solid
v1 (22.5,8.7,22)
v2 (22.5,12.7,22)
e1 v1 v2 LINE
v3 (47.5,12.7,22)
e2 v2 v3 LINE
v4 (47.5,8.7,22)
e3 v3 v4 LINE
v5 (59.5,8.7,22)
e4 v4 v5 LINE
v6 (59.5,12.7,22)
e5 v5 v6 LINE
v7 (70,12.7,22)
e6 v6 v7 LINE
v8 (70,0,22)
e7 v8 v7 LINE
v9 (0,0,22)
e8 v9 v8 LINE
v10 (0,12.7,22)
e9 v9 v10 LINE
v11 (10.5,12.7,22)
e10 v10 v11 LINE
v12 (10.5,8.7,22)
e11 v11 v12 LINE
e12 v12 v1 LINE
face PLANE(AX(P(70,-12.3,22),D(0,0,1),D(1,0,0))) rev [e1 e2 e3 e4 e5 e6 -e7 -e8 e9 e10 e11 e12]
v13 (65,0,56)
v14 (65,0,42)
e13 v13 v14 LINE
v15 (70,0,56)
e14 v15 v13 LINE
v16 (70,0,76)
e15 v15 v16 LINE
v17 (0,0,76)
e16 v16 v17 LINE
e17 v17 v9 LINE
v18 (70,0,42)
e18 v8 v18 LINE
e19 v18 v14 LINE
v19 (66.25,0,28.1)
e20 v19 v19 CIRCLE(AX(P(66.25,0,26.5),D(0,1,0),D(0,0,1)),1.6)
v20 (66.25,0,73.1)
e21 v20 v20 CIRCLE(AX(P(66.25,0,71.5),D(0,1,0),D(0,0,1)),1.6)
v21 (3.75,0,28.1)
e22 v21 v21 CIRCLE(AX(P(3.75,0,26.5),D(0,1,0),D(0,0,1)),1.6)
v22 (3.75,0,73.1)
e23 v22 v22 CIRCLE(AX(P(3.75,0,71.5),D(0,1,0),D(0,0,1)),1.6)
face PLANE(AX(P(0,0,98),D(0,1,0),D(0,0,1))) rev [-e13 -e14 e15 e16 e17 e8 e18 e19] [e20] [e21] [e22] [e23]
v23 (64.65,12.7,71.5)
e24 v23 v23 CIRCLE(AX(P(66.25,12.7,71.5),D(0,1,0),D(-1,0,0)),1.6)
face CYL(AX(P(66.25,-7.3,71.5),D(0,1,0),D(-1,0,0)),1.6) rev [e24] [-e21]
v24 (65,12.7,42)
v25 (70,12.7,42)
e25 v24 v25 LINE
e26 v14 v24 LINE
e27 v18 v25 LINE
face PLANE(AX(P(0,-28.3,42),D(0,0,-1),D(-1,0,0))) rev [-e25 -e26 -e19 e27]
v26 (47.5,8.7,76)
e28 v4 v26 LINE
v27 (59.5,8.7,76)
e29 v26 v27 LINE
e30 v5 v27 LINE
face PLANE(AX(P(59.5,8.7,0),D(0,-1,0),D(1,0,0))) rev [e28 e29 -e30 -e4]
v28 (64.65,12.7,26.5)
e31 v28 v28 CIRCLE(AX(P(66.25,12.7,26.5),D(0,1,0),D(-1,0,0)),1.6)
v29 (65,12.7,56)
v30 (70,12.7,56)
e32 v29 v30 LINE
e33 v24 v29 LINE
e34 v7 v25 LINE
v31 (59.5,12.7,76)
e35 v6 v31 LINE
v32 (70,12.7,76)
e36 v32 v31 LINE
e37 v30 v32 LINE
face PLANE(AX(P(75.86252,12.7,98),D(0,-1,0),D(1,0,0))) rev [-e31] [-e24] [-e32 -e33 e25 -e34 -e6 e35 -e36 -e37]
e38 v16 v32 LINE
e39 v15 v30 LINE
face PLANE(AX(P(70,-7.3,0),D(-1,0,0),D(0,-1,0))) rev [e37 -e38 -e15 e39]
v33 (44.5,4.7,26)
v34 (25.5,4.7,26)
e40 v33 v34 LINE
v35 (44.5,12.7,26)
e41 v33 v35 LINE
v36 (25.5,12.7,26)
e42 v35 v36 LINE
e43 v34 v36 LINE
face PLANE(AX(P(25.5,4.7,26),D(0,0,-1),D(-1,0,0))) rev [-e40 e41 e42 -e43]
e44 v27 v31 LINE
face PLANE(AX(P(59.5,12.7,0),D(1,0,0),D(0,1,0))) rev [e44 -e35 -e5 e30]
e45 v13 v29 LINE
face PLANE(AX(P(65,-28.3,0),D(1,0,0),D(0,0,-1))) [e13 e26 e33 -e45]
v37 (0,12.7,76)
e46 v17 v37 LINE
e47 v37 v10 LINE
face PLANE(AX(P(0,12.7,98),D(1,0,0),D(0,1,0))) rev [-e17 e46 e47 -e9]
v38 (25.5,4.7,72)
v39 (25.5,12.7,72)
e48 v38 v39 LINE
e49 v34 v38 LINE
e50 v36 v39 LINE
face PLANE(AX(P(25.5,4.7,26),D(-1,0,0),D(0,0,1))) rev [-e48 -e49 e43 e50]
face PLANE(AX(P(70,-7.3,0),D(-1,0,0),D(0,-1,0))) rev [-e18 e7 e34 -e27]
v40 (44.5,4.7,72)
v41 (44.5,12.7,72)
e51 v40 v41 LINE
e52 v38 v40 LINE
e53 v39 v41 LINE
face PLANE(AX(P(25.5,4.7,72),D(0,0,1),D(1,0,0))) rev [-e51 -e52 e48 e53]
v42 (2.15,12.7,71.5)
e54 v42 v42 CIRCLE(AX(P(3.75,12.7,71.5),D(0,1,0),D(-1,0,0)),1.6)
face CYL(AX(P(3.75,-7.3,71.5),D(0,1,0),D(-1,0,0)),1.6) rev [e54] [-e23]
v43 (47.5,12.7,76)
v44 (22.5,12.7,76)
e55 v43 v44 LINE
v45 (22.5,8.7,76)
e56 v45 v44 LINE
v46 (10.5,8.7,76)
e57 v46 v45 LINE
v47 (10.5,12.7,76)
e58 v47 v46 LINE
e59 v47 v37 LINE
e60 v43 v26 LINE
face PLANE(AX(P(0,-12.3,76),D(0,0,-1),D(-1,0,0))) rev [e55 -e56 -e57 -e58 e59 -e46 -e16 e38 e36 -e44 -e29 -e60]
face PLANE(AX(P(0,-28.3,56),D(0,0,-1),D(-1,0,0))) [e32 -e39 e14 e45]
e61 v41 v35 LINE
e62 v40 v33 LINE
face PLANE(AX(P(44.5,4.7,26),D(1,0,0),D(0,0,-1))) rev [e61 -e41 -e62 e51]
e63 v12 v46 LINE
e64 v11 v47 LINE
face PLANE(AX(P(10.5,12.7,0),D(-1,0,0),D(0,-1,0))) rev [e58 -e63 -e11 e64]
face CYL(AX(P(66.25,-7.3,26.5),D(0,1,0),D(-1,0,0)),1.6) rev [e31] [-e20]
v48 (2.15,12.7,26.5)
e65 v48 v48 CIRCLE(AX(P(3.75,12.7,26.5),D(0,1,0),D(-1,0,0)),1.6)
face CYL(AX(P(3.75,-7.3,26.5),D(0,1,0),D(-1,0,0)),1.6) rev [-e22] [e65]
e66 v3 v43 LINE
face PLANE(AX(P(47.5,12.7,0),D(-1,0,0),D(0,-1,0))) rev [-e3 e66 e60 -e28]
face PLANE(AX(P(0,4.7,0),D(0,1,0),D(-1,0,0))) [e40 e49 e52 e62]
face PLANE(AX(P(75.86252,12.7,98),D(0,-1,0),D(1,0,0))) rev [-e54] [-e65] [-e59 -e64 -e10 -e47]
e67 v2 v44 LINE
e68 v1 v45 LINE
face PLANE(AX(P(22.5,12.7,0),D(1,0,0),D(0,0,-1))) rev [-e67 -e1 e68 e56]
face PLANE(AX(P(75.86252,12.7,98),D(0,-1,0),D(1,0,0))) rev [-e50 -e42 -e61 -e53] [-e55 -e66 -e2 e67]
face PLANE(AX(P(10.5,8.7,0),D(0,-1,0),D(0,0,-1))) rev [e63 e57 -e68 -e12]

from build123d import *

# Parameters (mm, degrees)
RESSALTO_EXTRUS_O1_DEPTH    = 98
ESBO_O4_W                   = 33
ESBO_O4_H                   = 22
CORTE_EXTRUS_O3_DEPTH       = 25
ESBO_O10_W                  = 12
ESBO_O10_H                  = 4
CORTE_EXTRUS_O8_DEPTH       = 122.545423608
ESBO_O11_R                  = 1.6
CORTE_EXTRUS_O9_DEPTH       = 20
ESBO_O15_W                  = 4
ESBO_O15_H                  = 22
CORTE_EXTRUS_O11_DEPTH      = 137.386546257
CORTE_EXTRUS_O12_DEPTH      = 10
CORTE_EXTRUS_O12_DEPTH_BACK = 41
ESBO_O16_W                  = 5
ESBO_O16_H                  = 14
ESBO_O17_W                  = 11.435879356
ESBO_O17_H                  = 99.573316557
CORTE_EXTRUS_O13_DEPTH      = 20
ESBO_O18_W                  = 19
ESBO_O18_H                  = 46
CORTE_EXTRUS_O14_DEPTH      = 8


with BuildPart() as part:
    # Esboço1 → Ressalto-extrusão1 (new body)
    with BuildSketch(Plane.XY):
        Polygon((0, 0), (94, 0), (75.862520314, 12.7), (0, 12.7), align=None)
    extrude(amount=RESSALTO_EXTRUS_O1_DEPTH)

    # Esboço4 → Corte-extrusão3 (cut)
    with BuildSketch(Plane(origin=(0, 12.7, 0), x_dir=(1, 0, 0), z_dir=(0, 1, 0))):
        with Locations((16.5, -87)):
            Rectangle(ESBO_O4_W, ESBO_O4_H)
        with Locations((16.5, -11)):
            Rectangle(ESBO_O4_W, ESBO_O4_H)
        with Locations((53.5, -87)):
            Rectangle(ESBO_O4_W, ESBO_O4_H)
        with Locations((53.5, -11)):
            Rectangle(ESBO_O4_W, ESBO_O4_H)
    extrude(amount=-CORTE_EXTRUS_O3_DEPTH, mode=Mode.SUBTRACT)

    # Esboço10 → Corte-extrusão8 (cut, through all)
    with BuildSketch(Plane.XY.offset(76)):
        with Locations((16.5, 10.7)):
            Rectangle(ESBO_O10_W, ESBO_O10_H)
        with Locations((53.5, 10.7)):
            Rectangle(ESBO_O10_W, ESBO_O10_H)
    extrude(amount=-CORTE_EXTRUS_O8_DEPTH, mode=Mode.SUBTRACT)

    # Esboço11 → Corte-extrusão9 (cut)
    with BuildSketch(Plane(origin=(0, 12.7, 0), x_dir=(1, 0, 0), z_dir=(0, 1, 0))):
        with Locations((3.75, -71.5)):
            Circle(ESBO_O11_R)
        with Locations((3.75, -26.5)):
            Circle(ESBO_O11_R)
        with Locations((66.25, -26.5)):
            Circle(ESBO_O11_R)
        with Locations((66.25, -71.5)):
            Circle(ESBO_O11_R)
    extrude(amount=-CORTE_EXTRUS_O9_DEPTH, mode=Mode.SUBTRACT)

    # Esboço15 → Corte-extrusão11 (cut, through all)
    with BuildSketch(Plane(origin=(0, 12.7, 0), x_dir=(1, 0, 0), z_dir=(0, 1, 0))):
        with Locations((35, -11)):
            Rectangle(ESBO_O15_W, ESBO_O15_H)
        with Locations((35, -87)):
            Rectangle(ESBO_O15_W, ESBO_O15_H)
    extrude(amount=-CORTE_EXTRUS_O11_DEPTH, mode=Mode.SUBTRACT)

    # Esboço16 → Corte-extrusão12 (cut, two sides: drawn at the far end of the back side and taken through both)
    with BuildSketch(Plane(origin=(0, 12.7, 0), x_dir=(1, 0, 0), z_dir=(0, 1, 0)).offset(-CORTE_EXTRUS_O12_DEPTH_BACK)):
        Polygon((95.832875802, -109.85505817), (95.832875802, 2.472968948), (70, 2.472968948), (70, 0), (75.862520314, 0), (75.862520314, -98), (70, -98), (70, -109.85505817), align=None)
        with Locations((67.5, -49)):
            Rectangle(ESBO_O16_W, ESBO_O16_H)
    extrude(amount=CORTE_EXTRUS_O12_DEPTH + CORTE_EXTRUS_O12_DEPTH_BACK, mode=Mode.SUBTRACT)

    # Esboço17 → Corte-extrusão13 (cut)
    with BuildSketch(Plane(origin=(0, 12.7, 0), x_dir=(1, 0, 0), z_dir=(0, 1, 0))):
        with Locations((75.717939678, -49.786658279)):
            Rectangle(ESBO_O17_W, ESBO_O17_H)
    extrude(amount=-CORTE_EXTRUS_O13_DEPTH, mode=Mode.SUBTRACT)

    # Esboço18 → Corte-extrusão14 (cut)
    with BuildSketch(Plane(origin=(0, 12.7, 0), x_dir=(1, 0, 0), z_dir=(0, 1, 0))):
        with Locations((35, -49)):
            Rectangle(ESBO_O18_W, ESBO_O18_H)
    extrude(amount=-CORTE_EXTRUS_O14_DEPTH, mode=Mode.SUBTRACT)


solid = part.part
